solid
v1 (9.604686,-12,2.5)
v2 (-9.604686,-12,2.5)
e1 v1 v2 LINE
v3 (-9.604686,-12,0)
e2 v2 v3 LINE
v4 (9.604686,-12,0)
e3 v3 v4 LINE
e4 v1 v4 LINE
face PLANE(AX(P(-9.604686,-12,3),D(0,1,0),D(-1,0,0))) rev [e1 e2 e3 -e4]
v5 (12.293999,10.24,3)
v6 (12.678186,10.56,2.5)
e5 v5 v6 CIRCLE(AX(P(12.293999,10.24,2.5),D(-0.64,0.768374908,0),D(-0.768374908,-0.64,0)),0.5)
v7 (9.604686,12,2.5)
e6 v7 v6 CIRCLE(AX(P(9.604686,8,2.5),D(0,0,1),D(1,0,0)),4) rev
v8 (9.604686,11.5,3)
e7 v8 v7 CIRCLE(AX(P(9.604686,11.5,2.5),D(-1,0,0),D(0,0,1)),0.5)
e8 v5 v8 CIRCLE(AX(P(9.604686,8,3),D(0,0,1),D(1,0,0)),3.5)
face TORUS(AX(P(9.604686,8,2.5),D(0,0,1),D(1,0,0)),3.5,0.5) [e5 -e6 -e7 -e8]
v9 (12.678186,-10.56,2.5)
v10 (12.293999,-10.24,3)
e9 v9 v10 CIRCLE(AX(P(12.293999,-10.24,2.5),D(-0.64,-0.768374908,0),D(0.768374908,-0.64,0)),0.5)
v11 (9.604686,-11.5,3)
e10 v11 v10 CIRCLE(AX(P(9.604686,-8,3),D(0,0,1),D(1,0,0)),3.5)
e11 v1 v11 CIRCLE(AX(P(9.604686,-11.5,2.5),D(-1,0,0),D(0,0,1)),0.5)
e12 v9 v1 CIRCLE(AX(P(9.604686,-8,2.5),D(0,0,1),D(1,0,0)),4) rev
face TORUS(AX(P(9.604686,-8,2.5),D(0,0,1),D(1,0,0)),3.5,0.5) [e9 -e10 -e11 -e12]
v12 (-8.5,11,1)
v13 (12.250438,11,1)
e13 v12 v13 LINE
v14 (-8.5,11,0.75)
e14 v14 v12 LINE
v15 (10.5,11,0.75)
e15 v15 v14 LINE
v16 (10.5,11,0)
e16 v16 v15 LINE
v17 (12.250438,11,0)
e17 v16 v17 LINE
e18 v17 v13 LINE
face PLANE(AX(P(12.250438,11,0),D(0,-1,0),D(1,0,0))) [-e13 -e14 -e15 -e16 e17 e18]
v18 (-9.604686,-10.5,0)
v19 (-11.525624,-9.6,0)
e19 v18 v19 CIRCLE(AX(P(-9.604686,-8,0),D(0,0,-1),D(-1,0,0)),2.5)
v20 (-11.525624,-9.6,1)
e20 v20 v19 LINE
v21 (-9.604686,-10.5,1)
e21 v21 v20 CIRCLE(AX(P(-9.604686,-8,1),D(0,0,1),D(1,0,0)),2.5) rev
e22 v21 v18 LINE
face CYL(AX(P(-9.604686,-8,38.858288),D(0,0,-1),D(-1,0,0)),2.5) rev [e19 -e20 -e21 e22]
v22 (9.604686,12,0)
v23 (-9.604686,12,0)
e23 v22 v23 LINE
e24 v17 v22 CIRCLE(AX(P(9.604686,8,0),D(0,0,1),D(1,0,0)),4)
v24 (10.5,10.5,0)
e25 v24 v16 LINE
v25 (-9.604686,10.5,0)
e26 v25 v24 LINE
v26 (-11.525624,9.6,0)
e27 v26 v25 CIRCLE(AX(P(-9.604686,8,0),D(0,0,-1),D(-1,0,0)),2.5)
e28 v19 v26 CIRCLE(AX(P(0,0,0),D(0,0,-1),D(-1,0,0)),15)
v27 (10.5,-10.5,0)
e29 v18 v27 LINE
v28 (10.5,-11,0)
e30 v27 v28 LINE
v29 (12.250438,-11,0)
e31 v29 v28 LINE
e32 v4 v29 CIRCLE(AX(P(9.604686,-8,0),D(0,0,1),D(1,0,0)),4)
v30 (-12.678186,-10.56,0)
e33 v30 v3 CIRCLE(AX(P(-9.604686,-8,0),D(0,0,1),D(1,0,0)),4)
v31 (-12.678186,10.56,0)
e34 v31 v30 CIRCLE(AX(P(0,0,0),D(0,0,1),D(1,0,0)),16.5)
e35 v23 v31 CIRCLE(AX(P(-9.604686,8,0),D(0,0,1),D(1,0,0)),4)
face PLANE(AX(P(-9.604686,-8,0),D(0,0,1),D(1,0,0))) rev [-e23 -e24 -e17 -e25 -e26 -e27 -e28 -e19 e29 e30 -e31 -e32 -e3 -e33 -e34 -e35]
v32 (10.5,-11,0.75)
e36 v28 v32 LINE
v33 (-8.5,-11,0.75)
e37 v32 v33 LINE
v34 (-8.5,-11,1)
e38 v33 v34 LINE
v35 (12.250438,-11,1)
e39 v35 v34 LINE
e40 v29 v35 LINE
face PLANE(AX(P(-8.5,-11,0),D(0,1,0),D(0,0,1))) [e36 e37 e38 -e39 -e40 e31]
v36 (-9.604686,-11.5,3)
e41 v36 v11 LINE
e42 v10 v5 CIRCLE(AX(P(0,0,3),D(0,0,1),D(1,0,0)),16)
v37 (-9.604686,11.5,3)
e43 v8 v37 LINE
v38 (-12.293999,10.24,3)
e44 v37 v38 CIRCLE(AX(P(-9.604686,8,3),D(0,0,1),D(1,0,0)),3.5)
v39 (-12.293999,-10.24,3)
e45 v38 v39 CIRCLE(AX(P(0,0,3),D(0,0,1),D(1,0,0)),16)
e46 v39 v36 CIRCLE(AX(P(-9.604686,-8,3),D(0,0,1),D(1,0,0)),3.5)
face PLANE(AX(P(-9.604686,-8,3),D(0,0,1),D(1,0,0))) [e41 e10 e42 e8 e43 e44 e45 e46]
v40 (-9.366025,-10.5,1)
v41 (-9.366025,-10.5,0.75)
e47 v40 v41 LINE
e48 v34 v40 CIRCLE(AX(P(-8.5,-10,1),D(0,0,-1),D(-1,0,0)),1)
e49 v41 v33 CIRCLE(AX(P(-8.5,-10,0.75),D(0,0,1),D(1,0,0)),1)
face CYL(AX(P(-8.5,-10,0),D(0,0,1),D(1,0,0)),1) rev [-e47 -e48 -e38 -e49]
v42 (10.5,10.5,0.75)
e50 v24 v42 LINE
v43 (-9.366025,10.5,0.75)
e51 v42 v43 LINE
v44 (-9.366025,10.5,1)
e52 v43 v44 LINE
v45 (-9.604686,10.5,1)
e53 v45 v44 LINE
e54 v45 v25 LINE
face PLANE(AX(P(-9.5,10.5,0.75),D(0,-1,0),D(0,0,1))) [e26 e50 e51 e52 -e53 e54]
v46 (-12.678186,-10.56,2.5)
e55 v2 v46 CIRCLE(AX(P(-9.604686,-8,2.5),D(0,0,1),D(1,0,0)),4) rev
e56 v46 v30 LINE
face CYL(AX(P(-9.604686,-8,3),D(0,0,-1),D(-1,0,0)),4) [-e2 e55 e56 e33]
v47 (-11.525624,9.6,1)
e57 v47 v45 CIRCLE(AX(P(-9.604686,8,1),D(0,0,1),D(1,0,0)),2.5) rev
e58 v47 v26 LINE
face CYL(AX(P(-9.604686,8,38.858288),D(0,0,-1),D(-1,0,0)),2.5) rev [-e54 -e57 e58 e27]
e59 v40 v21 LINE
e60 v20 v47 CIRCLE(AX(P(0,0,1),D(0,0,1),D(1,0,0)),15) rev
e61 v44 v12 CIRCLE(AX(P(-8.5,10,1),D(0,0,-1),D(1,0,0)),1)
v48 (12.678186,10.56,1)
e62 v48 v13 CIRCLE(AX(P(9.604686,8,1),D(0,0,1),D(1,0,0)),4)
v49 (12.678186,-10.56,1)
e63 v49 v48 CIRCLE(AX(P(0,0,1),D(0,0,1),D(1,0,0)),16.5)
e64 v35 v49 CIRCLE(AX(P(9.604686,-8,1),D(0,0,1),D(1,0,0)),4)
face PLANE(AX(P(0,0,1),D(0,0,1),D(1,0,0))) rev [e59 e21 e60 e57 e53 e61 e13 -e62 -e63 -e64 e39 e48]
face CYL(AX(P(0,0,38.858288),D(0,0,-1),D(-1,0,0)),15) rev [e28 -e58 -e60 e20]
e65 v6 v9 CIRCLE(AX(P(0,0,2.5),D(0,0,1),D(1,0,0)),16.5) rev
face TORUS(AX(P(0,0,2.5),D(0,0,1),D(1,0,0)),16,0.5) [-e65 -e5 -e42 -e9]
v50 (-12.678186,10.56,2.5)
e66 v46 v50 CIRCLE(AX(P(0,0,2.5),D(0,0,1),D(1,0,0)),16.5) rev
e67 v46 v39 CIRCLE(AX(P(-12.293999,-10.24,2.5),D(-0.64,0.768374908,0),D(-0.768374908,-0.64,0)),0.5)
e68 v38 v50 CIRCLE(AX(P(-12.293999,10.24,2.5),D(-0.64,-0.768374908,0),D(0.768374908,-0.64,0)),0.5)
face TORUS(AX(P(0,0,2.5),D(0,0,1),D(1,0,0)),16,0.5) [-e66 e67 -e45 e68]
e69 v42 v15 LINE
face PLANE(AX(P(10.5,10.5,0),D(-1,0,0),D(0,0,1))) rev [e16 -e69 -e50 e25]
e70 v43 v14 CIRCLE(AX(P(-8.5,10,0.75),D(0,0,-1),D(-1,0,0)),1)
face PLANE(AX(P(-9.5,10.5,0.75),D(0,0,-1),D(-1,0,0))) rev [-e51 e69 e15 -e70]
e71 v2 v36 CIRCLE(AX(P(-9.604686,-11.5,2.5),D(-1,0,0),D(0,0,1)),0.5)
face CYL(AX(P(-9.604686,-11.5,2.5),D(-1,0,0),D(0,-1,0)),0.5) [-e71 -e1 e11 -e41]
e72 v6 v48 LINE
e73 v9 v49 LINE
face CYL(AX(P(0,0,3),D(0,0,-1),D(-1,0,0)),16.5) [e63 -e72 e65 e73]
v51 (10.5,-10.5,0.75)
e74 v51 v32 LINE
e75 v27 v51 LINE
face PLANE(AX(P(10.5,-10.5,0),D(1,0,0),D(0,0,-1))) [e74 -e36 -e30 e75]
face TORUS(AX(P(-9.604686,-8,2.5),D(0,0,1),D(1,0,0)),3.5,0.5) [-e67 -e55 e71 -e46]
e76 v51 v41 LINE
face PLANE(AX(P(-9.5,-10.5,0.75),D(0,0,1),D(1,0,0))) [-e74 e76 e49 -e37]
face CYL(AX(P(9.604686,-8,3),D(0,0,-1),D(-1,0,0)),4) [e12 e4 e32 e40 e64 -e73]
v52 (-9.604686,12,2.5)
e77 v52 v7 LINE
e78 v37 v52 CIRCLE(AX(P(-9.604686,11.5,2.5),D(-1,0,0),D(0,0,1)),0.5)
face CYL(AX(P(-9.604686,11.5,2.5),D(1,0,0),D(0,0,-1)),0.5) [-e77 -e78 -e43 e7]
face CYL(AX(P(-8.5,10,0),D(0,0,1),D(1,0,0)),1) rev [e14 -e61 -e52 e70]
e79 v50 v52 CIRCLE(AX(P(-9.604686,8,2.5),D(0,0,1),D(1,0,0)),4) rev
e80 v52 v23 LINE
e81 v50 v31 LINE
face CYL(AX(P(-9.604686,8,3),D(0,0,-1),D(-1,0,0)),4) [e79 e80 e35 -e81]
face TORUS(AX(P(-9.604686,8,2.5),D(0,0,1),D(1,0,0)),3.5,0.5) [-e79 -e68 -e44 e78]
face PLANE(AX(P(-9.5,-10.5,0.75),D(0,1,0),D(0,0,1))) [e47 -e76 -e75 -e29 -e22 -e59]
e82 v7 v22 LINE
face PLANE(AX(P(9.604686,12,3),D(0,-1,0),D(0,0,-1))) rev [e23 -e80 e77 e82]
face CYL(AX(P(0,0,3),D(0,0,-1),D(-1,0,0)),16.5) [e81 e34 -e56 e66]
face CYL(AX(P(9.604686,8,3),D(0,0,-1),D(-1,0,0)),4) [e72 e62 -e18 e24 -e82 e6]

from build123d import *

# Parameters (mm, degrees)
EXTRUDE1_DEPTH     = 3
FILLET2_R          = 0.5
CAVITY1_DEPTH      = 1
CAVITY1_START      = 0.75
CAVITY1_2_DEPTH    = 0.25
CUT_EXTRUDE1_START = -1
CUT_EXTRUDE1_DEPTH = 1


# Read off the part's stored shape, not the designer's step: Cavity1
with BuildPart() as part:
    # Sketch1 → Extrude1 (new body)
    with BuildSketch(Plane.XY):
        with BuildLine():
            Line((-9.604686356, -12), (9.604686356, -12))
            ThreePointArc((9.604686356, -12), (11.301742631, -11.622154055), (12.67818599, -10.56))
            ThreePointArc((12.67818599, -10.56), (16.5, 0), (12.67818599, 10.56))
            ThreePointArc((12.67818599, 10.56), (11.301742631, 11.622154055), (9.604686356, 12))
            Line((9.604686356, 12), (-9.604686356, 12))
            ThreePointArc((-9.604686356, 12), (-11.301742631, 11.622154055), (-12.67818599, 10.56))
            ThreePointArc((-12.67818599, 10.56), (-16.5, 0), (-12.67818599, -10.56))
            ThreePointArc((-12.67818599, -10.56), (-11.301742631, -11.622154055), (-9.604686356, -12))
        make_face()
    extrude(amount=EXTRUDE1_DEPTH)

    # Fillet2
    fillet2_edges = [part.edges().sort_by_distance(p)[0] for p in [
        (11.301742631, -11.622154055, 3),
        (16.5, 0, 3),
        (11.301742631, 11.622154055, 3),
        (0, 12, 3),
        (-11.301742631, 11.622154055, 3),
        (-16.5, 0, 3),
        (-11.301742631, -11.622154055, 3),
        (0, -12, 3),
    ]]
    fillet(fillet2_edges, radius=FILLET2_R)

    # Cavity1 outline → Cavity1 (cut)
    with BuildSketch(Plane.XY):
        with BuildLine():
            ThreePointArc((-9.366025404, 10.5), (-9.465925826, 10.258819045), (-9.5, 10))
            Line((-9.5, 10), (-8.996077446, 10))
            Line((-8.996077446, 10), (-8.996077446, 8.00000585))
            Line((-8.996077446, 8.00000585), (-7.996077446, 8.00000585))
            Line((-7.996077446, 8.00000585), (-7.996077446, 10))
            Line((-7.996077446, 10), (-0.5, 10))
            Line((-0.5, 10), (-0.5, 7.000002926))
            Line((-0.5, 7.000002926), (0.5, 7.000002926))
            Line((0.5, 7.000002926), (0.5, 10))
            Line((0.5, 10), (7.996077446, 10))
            Line((7.996077446, 10), (7.996077446, 8.00000585))
            Line((7.996077446, 8.00000585), (8.996077446, 8.00000585))
            Line((8.996077446, 8.00000585), (8.996077446, 10))
            Line((8.996077446, 10), (10.062305899, 10))
            ThreePointArc((10.062305899, 10), (10.470554189, 9.912870929), (10.807661891, 9.666666667))
            ThreePointArc((10.807661891, 9.666666667), (14.5, 0), (10.807661891, -9.666666667))
            ThreePointArc((10.807661891, -9.666666667), (10.470554189, -9.912870929), (10.062305899, -10))
            Line((10.062305899, -10), (-9.5, -10))
            ThreePointArc((-9.5, -10), (-9.465925826, -10.258819045), (-9.366025404, -10.5))
            Line((-9.366025404, -10.5), (10.5, -10.5))
            Line((10.5, -10.5), (10.5, -11))
            Line((10.5, -11), (12.250437667, -11))
            ThreePointArc((12.250437667, -11), (12.47276199, -10.788214869), (12.67818599, -10.56))
            ThreePointArc((12.67818599, -10.56), (16.5, 0), (12.67818599, 10.56))
            ThreePointArc((12.67818599, 10.56), (12.47276199, 10.788214869), (12.250437667, 11))
            Line((12.250437667, 11), (10.5, 11))
            Line((10.5, 11), (10.5, 10.5))
            Line((10.5, 10.5), (-9.366025404, 10.5))
        make_face()
    extrude(amount=CAVITY1_DEPTH, mode=Mode.SUBTRACT)

    # Cavity1 2 outline → Cavity1 2 (cut)
    with BuildSketch(Plane.XY.offset(CAVITY1_START)):
        with BuildLine():
            ThreePointArc((-8.5, 11), (-9, 10.866025404), (-9.366025404, 10.5))
            Line((-9.366025404, 10.5), (10.5, 10.5))
            Line((10.5, 10.5), (10.5, 11))
            Line((10.5, 11), (-8.5, 11))
        make_face()
        with BuildLine():
            Line((-8.5, -11), (10.5, -11))
            Line((10.5, -11), (10.5, -10.5))
            Line((10.5, -10.5), (-9.366025404, -10.5))
            ThreePointArc((-9.366025404, -10.5), (-9, -10.866025404), (-8.5, -11))
        make_face()
    extrude(amount=CAVITY1_2_DEPTH, mode=Mode.SUBTRACT)

    # Sketch2 → Cut-Extrude1 (cut)
    with BuildSketch(Plane(origin=(0, 0, 0), x_dir=(-1, 0, 0), z_dir=(0, 0, -1)).offset(CUT_EXTRUDE1_START)):
        with BuildLine():
            Line((9.604686356, 10.5), (-12.727922061, 10.5))
            ThreePointArc((-12.727922061, 10.5), (-16.5, 0), (-12.727922061, -10.5))
            Line((-12.727922061, -10.5), (9.604686356, -10.5))
            ThreePointArc((9.604686356, -10.5), (10.665346528, -10.263846285), (11.525623627, -9.6))
            ThreePointArc((11.525623627, -9.6), (15, 0), (11.525623627, 9.6))
            ThreePointArc((11.525623627, 9.6), (10.665346528, 10.263846285), (9.604686356, 10.5))
        make_face()
    extrude(amount=CUT_EXTRUDE1_DEPTH, mode=Mode.SUBTRACT)


solid = part.part
